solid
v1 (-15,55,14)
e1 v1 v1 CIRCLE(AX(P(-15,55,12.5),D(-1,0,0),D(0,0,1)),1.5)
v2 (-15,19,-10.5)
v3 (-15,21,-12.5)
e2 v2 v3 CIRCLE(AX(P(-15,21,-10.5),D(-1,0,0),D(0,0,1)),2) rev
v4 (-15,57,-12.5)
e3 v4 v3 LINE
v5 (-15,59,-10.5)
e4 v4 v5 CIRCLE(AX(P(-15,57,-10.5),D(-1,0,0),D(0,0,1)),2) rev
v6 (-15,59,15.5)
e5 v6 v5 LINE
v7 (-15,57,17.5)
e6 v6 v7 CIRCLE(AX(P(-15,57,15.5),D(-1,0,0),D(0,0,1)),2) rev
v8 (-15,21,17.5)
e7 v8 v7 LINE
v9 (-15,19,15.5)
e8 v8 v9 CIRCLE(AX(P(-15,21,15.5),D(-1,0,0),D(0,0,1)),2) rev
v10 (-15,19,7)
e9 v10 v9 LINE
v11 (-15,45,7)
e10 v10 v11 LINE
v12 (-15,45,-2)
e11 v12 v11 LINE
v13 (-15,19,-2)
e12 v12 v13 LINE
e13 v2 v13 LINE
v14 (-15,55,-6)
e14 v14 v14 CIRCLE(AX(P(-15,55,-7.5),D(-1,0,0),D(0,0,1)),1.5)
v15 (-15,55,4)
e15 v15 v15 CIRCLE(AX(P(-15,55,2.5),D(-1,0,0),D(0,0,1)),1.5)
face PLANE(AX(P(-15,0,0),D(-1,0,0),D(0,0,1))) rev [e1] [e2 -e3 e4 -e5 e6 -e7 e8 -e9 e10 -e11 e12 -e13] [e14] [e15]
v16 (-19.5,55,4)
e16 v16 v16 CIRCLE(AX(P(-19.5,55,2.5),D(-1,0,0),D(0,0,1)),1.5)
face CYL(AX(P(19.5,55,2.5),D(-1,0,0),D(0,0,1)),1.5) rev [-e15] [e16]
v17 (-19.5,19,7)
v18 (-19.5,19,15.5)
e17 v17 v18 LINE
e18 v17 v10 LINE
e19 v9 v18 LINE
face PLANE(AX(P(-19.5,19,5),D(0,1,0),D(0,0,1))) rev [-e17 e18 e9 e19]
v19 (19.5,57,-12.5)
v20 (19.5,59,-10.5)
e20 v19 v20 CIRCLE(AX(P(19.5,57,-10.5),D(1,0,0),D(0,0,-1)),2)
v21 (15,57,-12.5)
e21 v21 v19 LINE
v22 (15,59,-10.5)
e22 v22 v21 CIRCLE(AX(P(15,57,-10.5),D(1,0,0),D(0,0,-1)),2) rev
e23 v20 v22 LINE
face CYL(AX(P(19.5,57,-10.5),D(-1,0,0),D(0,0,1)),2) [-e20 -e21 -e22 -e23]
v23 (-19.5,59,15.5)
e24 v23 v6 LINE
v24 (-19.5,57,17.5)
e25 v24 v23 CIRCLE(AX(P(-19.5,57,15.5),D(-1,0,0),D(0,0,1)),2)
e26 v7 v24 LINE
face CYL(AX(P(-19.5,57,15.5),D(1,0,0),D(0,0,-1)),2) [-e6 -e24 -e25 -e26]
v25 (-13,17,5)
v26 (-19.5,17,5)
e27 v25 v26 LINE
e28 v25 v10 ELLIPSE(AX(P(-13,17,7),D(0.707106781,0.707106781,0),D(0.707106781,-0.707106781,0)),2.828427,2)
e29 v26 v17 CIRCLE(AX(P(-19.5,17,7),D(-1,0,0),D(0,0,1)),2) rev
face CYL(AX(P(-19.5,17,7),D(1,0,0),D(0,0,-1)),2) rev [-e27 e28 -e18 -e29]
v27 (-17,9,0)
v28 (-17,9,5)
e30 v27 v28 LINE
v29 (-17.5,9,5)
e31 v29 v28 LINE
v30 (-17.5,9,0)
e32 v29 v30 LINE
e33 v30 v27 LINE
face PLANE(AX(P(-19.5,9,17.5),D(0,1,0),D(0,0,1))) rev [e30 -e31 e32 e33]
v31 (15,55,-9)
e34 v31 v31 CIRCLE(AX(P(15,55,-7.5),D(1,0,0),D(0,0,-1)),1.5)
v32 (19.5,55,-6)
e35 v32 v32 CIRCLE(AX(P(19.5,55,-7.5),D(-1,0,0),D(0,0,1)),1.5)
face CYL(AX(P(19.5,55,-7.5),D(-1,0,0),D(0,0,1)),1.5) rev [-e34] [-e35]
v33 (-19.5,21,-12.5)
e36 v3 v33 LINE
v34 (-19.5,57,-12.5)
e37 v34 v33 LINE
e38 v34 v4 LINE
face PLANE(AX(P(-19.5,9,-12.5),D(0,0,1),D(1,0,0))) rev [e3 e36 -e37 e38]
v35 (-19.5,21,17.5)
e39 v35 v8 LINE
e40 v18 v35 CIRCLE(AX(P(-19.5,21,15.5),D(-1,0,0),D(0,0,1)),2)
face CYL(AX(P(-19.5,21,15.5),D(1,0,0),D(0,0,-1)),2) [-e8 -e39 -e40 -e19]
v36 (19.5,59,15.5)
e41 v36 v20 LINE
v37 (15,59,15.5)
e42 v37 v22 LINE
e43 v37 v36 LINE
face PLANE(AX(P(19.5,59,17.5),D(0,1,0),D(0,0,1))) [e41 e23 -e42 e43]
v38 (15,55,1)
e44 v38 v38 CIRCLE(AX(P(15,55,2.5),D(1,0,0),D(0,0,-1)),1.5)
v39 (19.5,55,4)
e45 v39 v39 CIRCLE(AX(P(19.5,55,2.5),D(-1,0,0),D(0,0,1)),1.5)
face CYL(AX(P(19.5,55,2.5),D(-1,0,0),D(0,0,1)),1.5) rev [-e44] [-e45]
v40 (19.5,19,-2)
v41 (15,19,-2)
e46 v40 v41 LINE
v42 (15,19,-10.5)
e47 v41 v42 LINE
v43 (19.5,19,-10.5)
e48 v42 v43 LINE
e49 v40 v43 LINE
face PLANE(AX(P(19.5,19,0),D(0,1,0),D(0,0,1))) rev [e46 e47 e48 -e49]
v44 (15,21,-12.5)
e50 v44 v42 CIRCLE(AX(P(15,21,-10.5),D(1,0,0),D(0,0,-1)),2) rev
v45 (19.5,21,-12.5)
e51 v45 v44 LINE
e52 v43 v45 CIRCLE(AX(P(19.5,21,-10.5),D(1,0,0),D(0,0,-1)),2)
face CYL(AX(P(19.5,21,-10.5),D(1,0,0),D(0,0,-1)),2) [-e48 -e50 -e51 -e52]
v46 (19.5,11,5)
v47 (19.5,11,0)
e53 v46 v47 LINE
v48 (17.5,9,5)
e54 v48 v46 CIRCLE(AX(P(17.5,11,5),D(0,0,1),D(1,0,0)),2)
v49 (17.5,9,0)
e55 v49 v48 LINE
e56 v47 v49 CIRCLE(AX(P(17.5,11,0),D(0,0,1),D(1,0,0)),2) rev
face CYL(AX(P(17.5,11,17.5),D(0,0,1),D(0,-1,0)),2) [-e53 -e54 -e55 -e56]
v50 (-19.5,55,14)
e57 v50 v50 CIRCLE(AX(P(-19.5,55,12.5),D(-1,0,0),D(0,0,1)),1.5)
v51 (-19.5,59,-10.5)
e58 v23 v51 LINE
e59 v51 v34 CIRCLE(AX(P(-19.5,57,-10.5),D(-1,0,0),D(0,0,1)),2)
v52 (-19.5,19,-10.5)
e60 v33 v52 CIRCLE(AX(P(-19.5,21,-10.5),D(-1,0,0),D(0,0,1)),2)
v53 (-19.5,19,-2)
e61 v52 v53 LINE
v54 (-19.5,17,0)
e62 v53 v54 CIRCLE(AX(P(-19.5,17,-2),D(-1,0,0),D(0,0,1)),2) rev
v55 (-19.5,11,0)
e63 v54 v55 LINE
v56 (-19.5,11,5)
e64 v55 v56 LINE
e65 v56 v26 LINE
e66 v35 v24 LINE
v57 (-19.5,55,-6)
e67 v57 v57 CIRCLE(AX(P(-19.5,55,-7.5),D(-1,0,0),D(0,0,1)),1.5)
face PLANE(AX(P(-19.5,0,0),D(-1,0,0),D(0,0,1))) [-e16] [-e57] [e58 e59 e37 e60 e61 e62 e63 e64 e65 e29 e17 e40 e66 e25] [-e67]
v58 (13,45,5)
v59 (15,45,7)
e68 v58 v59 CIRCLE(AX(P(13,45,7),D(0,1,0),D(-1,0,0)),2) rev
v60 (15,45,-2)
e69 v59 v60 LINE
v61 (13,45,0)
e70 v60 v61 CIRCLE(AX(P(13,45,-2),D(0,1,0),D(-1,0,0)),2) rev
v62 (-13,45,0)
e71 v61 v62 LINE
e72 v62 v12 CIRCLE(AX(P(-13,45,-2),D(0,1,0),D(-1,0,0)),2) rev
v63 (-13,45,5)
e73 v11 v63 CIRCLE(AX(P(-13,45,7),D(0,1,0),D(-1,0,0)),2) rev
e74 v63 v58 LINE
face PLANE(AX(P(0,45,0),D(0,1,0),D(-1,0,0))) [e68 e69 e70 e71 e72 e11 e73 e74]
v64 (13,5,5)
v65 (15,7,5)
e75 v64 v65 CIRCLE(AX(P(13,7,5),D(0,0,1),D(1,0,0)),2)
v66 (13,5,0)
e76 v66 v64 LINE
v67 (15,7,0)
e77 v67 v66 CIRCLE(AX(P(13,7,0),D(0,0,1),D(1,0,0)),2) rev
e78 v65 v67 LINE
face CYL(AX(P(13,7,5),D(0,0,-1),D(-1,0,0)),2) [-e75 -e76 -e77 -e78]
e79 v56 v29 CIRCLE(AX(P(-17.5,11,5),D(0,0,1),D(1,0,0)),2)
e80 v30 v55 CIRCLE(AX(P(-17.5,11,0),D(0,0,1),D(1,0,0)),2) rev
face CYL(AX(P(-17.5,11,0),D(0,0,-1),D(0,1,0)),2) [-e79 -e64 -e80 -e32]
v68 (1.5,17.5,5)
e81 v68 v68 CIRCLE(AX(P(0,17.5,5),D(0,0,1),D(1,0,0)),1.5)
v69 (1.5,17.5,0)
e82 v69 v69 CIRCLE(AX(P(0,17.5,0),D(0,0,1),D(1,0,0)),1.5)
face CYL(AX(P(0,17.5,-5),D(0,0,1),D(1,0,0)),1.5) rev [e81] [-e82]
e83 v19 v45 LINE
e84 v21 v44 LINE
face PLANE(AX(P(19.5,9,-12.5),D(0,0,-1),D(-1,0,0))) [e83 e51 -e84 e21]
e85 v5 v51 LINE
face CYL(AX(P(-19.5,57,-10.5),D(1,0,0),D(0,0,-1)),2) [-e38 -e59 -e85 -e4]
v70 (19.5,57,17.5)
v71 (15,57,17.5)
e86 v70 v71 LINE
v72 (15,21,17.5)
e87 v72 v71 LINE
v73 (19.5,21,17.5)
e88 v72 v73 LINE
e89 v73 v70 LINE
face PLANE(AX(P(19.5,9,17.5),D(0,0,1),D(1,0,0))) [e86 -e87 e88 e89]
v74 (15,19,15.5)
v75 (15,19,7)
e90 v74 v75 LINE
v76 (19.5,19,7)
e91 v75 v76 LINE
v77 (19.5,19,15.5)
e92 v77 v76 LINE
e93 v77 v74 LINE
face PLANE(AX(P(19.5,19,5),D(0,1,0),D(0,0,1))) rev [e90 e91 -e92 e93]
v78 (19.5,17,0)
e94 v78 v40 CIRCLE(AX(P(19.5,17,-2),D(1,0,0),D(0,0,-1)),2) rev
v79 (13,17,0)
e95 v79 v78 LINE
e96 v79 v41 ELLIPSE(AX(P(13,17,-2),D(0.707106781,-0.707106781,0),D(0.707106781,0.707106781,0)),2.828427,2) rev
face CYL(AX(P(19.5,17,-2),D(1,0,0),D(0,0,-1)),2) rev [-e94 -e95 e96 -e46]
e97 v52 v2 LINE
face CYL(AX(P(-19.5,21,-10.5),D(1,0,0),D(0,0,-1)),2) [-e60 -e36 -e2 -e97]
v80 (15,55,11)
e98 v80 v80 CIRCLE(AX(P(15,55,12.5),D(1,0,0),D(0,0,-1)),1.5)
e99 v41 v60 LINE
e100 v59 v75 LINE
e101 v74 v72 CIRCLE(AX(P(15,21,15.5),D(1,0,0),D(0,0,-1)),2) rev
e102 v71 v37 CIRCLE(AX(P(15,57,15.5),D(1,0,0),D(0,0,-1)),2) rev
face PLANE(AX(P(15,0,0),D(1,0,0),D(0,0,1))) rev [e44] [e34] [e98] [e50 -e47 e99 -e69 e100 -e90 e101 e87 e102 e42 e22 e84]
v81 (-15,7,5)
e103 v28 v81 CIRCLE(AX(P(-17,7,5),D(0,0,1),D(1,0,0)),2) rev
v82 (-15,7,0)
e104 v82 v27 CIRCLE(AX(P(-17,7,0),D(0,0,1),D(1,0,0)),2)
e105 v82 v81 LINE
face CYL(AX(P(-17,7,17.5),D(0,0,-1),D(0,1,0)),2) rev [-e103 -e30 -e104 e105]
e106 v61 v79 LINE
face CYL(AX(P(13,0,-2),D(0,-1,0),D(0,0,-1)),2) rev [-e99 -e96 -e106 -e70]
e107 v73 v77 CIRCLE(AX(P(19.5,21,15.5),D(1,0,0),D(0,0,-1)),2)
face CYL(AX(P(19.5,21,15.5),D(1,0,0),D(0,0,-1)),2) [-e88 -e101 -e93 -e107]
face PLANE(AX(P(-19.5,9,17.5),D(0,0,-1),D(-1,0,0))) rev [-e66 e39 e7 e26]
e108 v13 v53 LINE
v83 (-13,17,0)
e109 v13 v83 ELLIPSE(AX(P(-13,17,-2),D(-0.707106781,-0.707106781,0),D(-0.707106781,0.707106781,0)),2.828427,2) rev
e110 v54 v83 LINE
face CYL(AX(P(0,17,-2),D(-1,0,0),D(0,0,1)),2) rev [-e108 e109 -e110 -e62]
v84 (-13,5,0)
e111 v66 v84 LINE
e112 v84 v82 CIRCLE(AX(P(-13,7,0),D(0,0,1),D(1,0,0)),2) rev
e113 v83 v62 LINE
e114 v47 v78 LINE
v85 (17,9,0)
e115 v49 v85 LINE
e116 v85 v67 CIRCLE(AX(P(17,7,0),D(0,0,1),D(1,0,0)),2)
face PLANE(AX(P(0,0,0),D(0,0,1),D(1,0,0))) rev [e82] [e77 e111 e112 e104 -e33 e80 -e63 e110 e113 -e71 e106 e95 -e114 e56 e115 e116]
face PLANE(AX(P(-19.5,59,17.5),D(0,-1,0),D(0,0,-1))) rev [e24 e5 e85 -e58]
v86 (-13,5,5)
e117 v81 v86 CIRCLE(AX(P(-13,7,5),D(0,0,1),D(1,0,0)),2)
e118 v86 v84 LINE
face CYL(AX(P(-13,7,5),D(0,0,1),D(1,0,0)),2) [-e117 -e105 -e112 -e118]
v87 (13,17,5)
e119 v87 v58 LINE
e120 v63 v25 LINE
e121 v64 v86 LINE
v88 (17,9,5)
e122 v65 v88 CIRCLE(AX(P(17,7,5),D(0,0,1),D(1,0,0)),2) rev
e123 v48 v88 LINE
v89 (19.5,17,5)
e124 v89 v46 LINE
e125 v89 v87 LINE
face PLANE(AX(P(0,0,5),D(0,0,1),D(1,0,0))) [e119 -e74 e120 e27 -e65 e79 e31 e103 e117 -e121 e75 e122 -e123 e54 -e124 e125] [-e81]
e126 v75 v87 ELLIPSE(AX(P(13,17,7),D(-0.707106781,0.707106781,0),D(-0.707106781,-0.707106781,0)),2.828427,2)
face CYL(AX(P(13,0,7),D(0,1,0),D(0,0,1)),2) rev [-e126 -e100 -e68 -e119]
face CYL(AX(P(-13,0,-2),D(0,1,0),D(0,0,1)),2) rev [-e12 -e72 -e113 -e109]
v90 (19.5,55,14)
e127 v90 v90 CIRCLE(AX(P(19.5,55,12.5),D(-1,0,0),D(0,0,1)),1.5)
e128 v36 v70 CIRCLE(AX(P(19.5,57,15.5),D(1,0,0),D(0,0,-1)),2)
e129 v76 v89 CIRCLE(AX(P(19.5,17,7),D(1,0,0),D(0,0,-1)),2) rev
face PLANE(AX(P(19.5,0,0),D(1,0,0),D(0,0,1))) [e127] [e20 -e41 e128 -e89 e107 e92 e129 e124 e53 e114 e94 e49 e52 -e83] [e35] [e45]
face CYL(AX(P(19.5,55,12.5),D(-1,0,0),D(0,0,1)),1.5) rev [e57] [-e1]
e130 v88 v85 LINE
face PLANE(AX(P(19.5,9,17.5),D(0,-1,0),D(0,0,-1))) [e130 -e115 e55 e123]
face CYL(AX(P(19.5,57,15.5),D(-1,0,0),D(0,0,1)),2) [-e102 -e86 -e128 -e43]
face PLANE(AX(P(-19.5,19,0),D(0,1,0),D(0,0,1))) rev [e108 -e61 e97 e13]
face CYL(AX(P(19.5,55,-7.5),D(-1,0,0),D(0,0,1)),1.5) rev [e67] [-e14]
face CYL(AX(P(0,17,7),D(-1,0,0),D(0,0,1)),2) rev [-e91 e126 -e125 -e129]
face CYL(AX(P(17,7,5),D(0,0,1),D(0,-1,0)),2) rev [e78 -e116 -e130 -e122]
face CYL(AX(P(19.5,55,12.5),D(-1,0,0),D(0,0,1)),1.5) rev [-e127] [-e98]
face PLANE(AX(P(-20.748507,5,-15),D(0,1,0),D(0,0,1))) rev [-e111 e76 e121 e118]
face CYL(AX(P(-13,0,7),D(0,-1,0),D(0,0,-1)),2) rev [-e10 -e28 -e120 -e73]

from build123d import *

# Parameters (mm, degrees)
SKETCH_1_W           = 30
SKETCH_1_H           = 50
EXTRUDE_1_DEPTH      = 5
SKETCH_5_W           = 30
SKETCH_5_H           = 50
EXTRUDE_2_DEPTH      = 4.5
SKETCH_6_R           = 1.5
CUT_EXTRUDE_1_DEPTH  = 73.857738093
SKETCH_7_R           = 1.5
CUT_EXTRUDE_2_DEPTH  = 73.857738093
SKETCH_12_W          = 12.5
SKETCH_12_H          = 10
CUT_EXTRUDE_8_DEPTH  = 71.551399703
SKETCH_13_W          = 12.5
SKETCH_13_H          = 10
CUT_EXTRUDE_9_DEPTH  = 71.551399703
SKETCH_16_W          = 30
SKETCH_16_H          = 5
EXTRUDE_3_DEPTH      = 20
SKETCH_17_R          = 1.5
CUT_EXTRUDE_10_DEPTH = 20
SKETCH_18_W          = 53.118549685
SKETCH_18_H          = 48.988218424
CUT_EXTRUDE_11_DEPTH = 20
FILLET_1_R           = 2
FILLET_2_R           = 2
FILLET_3_R           = 2
FILLET_4_R           = 2
SKETCH_19_R          = 1.5
CUT_EXTRUDE_12_DEPTH = 10
SKETCH_21_R          = 1.5
EXTRUDE_4_DEPTH      = 5


with BuildPart() as part:
    # 草图1 → 凸台-拉伸1 (new body)
    with BuildSketch(Plane.XY):
        Rectangle(SKETCH_1_W, SKETCH_1_H)
    extrude(amount=EXTRUDE_1_DEPTH)

    # 草图5 → 凸台-拉伸2 (add)
    with BuildSketch(Plane.ZY.offset(15)):
        with Locations((2.5, 34)):
            Rectangle(SKETCH_5_W, SKETCH_5_H)
    extrude_2 = extrude(amount=EXTRUDE_2_DEPTH)

    # 镜向1: 凸台-拉伸2 across plane
    add(extrude_2.mirror(Plane(origin=(0, 0, 0), x_dir=(0, 0, 1), z_dir=(1, 0, 0))))

    # 草图6 → 切除-拉伸1 (cut, through all)
    with BuildSketch(Plane.ZY.offset(19.5)):
        with Locations((2.5, 55)):
            Circle(SKETCH_6_R)
    extrude(amount=-CUT_EXTRUDE_1_DEPTH, mode=Mode.SUBTRACT)

    # 草图7 → 切除-拉伸2 (cut, through all)
    with BuildSketch(Plane.ZY.offset(19.5)):
        with Locations((-7.5, 55)):
            Circle(SKETCH_7_R)
        with Locations((12.5, 55)):
            Circle(SKETCH_7_R)
    extrude(amount=-CUT_EXTRUDE_2_DEPTH, mode=Mode.SUBTRACT)

    # 草图12 → 切除-拉伸8 (cut, through all)
    with BuildSketch(Plane(origin=(-15, 0, 0), x_dir=(0, 0, -1), z_dir=(1, 0, 0))):
        with Locations((6.25, 14)):
            Rectangle(SKETCH_12_W, SKETCH_12_H)
        with Locations((-11.25, 14)):
            Rectangle(SKETCH_12_W, SKETCH_12_H)
    extrude(amount=-CUT_EXTRUDE_8_DEPTH, mode=Mode.SUBTRACT)

    # 草图13 → 切除-拉伸9 (cut, through all)
    with BuildSketch(Plane.ZY.offset(-15)):
        with Locations((11.25, 14)):
            Rectangle(SKETCH_13_W, SKETCH_13_H)
        with Locations((-6.25, 14)):
            Rectangle(SKETCH_13_W, SKETCH_13_H)
    extrude(amount=-CUT_EXTRUDE_9_DEPTH, mode=Mode.SUBTRACT)

    # 草图16 → 凸台-拉伸3 (add)
    with BuildSketch(Plane(origin=(0, 25, 0), x_dir=(1, 0, 0), z_dir=(0, 1, 0))):
        with Locations((0, -2.5)):
            Rectangle(SKETCH_16_W, SKETCH_16_H)
    extrude(amount=EXTRUDE_3_DEPTH)

    # 草图17 → 切除-拉伸10 (cut)
    with BuildSketch(Plane.XY.offset(5)):
        with Locations((0, 12.5)):
            Circle(SKETCH_17_R)
    extrude(amount=-CUT_EXTRUDE_10_DEPTH, mode=Mode.SUBTRACT)

    # 草图18 → 切除-拉伸11 (cut)
    with BuildSketch(Plane.XY.offset(5)):
        with Locations((5.810767558, -19.494109212)):
            Rectangle(SKETCH_18_W, SKETCH_18_H)
    extrude(amount=-CUT_EXTRUDE_11_DEPTH, mode=Mode.SUBTRACT)

    # 圆角1
    fillet_1_edges = [part.edges().sort_by_distance(p)[0] for p in [
        (17.25, 19, 5),
        (17.25, 19, 0),
        (-17.25, 19, 0),
        (-17.25, 19, 5),
    ]]
    fillet(fillet_1_edges, radius=FILLET_1_R)

    # 圆角2
    fillet_2_edges = [part.edges().sort_by_distance(p)[0] for p in [
        (15, 31, 0),
        (-15, 31, 0),
        (15, 31, 5),
        (-15, 31, 5),
    ]]
    fillet(fillet_2_edges, radius=FILLET_2_R)

    # 圆角3
    fillet_3_edges = [part.edges().sort_by_distance(p)[0] for p in [
        (17.25, 19, 17.5),
        (17.25, 19, -12.5),
        (-17.25, 59, -12.5),
        (-17.25, 59, 17.5),
        (17.25, 59, -12.5),
        (17.25, 59, 17.5),
        (-17.25, 19, -12.5),
        (-17.25, 19, 17.5),
    ]]
    fillet(fillet_3_edges, radius=FILLET_3_R)

    # 圆角4
    fillet_4_edges = [part.edges().sort_by_distance(p)[0] for p in [
        (15, 9, 2.5),
        (-15, 9, 2.5),
        (19.5, 9, 2.5),
        (15, 5, 2.5),
        (-15, 5, 2.5),
        (-19.5, 9, 2.5),
    ]]
    fillet(fillet_4_edges, radius=FILLET_4_R - 0.0001)  # a hair under: the kernel refuses the full size

    # 草图19 → 切除-拉伸12 (cut)
    with BuildSketch(Plane.XY.offset(5)):
        with Locations((0, 17.5)):
            Circle(SKETCH_19_R)
    extrude(amount=-CUT_EXTRUDE_12_DEPTH, mode=Mode.SUBTRACT)

    # 草图21 → 凸台-拉伸4 (add)
    with BuildSketch(Plane.XY.offset(5)):
        with Locations((0, 12.5)):
            Circle(SKETCH_21_R)
    extrude(amount=-EXTRUDE_4_DEPTH)


solid = part.part
